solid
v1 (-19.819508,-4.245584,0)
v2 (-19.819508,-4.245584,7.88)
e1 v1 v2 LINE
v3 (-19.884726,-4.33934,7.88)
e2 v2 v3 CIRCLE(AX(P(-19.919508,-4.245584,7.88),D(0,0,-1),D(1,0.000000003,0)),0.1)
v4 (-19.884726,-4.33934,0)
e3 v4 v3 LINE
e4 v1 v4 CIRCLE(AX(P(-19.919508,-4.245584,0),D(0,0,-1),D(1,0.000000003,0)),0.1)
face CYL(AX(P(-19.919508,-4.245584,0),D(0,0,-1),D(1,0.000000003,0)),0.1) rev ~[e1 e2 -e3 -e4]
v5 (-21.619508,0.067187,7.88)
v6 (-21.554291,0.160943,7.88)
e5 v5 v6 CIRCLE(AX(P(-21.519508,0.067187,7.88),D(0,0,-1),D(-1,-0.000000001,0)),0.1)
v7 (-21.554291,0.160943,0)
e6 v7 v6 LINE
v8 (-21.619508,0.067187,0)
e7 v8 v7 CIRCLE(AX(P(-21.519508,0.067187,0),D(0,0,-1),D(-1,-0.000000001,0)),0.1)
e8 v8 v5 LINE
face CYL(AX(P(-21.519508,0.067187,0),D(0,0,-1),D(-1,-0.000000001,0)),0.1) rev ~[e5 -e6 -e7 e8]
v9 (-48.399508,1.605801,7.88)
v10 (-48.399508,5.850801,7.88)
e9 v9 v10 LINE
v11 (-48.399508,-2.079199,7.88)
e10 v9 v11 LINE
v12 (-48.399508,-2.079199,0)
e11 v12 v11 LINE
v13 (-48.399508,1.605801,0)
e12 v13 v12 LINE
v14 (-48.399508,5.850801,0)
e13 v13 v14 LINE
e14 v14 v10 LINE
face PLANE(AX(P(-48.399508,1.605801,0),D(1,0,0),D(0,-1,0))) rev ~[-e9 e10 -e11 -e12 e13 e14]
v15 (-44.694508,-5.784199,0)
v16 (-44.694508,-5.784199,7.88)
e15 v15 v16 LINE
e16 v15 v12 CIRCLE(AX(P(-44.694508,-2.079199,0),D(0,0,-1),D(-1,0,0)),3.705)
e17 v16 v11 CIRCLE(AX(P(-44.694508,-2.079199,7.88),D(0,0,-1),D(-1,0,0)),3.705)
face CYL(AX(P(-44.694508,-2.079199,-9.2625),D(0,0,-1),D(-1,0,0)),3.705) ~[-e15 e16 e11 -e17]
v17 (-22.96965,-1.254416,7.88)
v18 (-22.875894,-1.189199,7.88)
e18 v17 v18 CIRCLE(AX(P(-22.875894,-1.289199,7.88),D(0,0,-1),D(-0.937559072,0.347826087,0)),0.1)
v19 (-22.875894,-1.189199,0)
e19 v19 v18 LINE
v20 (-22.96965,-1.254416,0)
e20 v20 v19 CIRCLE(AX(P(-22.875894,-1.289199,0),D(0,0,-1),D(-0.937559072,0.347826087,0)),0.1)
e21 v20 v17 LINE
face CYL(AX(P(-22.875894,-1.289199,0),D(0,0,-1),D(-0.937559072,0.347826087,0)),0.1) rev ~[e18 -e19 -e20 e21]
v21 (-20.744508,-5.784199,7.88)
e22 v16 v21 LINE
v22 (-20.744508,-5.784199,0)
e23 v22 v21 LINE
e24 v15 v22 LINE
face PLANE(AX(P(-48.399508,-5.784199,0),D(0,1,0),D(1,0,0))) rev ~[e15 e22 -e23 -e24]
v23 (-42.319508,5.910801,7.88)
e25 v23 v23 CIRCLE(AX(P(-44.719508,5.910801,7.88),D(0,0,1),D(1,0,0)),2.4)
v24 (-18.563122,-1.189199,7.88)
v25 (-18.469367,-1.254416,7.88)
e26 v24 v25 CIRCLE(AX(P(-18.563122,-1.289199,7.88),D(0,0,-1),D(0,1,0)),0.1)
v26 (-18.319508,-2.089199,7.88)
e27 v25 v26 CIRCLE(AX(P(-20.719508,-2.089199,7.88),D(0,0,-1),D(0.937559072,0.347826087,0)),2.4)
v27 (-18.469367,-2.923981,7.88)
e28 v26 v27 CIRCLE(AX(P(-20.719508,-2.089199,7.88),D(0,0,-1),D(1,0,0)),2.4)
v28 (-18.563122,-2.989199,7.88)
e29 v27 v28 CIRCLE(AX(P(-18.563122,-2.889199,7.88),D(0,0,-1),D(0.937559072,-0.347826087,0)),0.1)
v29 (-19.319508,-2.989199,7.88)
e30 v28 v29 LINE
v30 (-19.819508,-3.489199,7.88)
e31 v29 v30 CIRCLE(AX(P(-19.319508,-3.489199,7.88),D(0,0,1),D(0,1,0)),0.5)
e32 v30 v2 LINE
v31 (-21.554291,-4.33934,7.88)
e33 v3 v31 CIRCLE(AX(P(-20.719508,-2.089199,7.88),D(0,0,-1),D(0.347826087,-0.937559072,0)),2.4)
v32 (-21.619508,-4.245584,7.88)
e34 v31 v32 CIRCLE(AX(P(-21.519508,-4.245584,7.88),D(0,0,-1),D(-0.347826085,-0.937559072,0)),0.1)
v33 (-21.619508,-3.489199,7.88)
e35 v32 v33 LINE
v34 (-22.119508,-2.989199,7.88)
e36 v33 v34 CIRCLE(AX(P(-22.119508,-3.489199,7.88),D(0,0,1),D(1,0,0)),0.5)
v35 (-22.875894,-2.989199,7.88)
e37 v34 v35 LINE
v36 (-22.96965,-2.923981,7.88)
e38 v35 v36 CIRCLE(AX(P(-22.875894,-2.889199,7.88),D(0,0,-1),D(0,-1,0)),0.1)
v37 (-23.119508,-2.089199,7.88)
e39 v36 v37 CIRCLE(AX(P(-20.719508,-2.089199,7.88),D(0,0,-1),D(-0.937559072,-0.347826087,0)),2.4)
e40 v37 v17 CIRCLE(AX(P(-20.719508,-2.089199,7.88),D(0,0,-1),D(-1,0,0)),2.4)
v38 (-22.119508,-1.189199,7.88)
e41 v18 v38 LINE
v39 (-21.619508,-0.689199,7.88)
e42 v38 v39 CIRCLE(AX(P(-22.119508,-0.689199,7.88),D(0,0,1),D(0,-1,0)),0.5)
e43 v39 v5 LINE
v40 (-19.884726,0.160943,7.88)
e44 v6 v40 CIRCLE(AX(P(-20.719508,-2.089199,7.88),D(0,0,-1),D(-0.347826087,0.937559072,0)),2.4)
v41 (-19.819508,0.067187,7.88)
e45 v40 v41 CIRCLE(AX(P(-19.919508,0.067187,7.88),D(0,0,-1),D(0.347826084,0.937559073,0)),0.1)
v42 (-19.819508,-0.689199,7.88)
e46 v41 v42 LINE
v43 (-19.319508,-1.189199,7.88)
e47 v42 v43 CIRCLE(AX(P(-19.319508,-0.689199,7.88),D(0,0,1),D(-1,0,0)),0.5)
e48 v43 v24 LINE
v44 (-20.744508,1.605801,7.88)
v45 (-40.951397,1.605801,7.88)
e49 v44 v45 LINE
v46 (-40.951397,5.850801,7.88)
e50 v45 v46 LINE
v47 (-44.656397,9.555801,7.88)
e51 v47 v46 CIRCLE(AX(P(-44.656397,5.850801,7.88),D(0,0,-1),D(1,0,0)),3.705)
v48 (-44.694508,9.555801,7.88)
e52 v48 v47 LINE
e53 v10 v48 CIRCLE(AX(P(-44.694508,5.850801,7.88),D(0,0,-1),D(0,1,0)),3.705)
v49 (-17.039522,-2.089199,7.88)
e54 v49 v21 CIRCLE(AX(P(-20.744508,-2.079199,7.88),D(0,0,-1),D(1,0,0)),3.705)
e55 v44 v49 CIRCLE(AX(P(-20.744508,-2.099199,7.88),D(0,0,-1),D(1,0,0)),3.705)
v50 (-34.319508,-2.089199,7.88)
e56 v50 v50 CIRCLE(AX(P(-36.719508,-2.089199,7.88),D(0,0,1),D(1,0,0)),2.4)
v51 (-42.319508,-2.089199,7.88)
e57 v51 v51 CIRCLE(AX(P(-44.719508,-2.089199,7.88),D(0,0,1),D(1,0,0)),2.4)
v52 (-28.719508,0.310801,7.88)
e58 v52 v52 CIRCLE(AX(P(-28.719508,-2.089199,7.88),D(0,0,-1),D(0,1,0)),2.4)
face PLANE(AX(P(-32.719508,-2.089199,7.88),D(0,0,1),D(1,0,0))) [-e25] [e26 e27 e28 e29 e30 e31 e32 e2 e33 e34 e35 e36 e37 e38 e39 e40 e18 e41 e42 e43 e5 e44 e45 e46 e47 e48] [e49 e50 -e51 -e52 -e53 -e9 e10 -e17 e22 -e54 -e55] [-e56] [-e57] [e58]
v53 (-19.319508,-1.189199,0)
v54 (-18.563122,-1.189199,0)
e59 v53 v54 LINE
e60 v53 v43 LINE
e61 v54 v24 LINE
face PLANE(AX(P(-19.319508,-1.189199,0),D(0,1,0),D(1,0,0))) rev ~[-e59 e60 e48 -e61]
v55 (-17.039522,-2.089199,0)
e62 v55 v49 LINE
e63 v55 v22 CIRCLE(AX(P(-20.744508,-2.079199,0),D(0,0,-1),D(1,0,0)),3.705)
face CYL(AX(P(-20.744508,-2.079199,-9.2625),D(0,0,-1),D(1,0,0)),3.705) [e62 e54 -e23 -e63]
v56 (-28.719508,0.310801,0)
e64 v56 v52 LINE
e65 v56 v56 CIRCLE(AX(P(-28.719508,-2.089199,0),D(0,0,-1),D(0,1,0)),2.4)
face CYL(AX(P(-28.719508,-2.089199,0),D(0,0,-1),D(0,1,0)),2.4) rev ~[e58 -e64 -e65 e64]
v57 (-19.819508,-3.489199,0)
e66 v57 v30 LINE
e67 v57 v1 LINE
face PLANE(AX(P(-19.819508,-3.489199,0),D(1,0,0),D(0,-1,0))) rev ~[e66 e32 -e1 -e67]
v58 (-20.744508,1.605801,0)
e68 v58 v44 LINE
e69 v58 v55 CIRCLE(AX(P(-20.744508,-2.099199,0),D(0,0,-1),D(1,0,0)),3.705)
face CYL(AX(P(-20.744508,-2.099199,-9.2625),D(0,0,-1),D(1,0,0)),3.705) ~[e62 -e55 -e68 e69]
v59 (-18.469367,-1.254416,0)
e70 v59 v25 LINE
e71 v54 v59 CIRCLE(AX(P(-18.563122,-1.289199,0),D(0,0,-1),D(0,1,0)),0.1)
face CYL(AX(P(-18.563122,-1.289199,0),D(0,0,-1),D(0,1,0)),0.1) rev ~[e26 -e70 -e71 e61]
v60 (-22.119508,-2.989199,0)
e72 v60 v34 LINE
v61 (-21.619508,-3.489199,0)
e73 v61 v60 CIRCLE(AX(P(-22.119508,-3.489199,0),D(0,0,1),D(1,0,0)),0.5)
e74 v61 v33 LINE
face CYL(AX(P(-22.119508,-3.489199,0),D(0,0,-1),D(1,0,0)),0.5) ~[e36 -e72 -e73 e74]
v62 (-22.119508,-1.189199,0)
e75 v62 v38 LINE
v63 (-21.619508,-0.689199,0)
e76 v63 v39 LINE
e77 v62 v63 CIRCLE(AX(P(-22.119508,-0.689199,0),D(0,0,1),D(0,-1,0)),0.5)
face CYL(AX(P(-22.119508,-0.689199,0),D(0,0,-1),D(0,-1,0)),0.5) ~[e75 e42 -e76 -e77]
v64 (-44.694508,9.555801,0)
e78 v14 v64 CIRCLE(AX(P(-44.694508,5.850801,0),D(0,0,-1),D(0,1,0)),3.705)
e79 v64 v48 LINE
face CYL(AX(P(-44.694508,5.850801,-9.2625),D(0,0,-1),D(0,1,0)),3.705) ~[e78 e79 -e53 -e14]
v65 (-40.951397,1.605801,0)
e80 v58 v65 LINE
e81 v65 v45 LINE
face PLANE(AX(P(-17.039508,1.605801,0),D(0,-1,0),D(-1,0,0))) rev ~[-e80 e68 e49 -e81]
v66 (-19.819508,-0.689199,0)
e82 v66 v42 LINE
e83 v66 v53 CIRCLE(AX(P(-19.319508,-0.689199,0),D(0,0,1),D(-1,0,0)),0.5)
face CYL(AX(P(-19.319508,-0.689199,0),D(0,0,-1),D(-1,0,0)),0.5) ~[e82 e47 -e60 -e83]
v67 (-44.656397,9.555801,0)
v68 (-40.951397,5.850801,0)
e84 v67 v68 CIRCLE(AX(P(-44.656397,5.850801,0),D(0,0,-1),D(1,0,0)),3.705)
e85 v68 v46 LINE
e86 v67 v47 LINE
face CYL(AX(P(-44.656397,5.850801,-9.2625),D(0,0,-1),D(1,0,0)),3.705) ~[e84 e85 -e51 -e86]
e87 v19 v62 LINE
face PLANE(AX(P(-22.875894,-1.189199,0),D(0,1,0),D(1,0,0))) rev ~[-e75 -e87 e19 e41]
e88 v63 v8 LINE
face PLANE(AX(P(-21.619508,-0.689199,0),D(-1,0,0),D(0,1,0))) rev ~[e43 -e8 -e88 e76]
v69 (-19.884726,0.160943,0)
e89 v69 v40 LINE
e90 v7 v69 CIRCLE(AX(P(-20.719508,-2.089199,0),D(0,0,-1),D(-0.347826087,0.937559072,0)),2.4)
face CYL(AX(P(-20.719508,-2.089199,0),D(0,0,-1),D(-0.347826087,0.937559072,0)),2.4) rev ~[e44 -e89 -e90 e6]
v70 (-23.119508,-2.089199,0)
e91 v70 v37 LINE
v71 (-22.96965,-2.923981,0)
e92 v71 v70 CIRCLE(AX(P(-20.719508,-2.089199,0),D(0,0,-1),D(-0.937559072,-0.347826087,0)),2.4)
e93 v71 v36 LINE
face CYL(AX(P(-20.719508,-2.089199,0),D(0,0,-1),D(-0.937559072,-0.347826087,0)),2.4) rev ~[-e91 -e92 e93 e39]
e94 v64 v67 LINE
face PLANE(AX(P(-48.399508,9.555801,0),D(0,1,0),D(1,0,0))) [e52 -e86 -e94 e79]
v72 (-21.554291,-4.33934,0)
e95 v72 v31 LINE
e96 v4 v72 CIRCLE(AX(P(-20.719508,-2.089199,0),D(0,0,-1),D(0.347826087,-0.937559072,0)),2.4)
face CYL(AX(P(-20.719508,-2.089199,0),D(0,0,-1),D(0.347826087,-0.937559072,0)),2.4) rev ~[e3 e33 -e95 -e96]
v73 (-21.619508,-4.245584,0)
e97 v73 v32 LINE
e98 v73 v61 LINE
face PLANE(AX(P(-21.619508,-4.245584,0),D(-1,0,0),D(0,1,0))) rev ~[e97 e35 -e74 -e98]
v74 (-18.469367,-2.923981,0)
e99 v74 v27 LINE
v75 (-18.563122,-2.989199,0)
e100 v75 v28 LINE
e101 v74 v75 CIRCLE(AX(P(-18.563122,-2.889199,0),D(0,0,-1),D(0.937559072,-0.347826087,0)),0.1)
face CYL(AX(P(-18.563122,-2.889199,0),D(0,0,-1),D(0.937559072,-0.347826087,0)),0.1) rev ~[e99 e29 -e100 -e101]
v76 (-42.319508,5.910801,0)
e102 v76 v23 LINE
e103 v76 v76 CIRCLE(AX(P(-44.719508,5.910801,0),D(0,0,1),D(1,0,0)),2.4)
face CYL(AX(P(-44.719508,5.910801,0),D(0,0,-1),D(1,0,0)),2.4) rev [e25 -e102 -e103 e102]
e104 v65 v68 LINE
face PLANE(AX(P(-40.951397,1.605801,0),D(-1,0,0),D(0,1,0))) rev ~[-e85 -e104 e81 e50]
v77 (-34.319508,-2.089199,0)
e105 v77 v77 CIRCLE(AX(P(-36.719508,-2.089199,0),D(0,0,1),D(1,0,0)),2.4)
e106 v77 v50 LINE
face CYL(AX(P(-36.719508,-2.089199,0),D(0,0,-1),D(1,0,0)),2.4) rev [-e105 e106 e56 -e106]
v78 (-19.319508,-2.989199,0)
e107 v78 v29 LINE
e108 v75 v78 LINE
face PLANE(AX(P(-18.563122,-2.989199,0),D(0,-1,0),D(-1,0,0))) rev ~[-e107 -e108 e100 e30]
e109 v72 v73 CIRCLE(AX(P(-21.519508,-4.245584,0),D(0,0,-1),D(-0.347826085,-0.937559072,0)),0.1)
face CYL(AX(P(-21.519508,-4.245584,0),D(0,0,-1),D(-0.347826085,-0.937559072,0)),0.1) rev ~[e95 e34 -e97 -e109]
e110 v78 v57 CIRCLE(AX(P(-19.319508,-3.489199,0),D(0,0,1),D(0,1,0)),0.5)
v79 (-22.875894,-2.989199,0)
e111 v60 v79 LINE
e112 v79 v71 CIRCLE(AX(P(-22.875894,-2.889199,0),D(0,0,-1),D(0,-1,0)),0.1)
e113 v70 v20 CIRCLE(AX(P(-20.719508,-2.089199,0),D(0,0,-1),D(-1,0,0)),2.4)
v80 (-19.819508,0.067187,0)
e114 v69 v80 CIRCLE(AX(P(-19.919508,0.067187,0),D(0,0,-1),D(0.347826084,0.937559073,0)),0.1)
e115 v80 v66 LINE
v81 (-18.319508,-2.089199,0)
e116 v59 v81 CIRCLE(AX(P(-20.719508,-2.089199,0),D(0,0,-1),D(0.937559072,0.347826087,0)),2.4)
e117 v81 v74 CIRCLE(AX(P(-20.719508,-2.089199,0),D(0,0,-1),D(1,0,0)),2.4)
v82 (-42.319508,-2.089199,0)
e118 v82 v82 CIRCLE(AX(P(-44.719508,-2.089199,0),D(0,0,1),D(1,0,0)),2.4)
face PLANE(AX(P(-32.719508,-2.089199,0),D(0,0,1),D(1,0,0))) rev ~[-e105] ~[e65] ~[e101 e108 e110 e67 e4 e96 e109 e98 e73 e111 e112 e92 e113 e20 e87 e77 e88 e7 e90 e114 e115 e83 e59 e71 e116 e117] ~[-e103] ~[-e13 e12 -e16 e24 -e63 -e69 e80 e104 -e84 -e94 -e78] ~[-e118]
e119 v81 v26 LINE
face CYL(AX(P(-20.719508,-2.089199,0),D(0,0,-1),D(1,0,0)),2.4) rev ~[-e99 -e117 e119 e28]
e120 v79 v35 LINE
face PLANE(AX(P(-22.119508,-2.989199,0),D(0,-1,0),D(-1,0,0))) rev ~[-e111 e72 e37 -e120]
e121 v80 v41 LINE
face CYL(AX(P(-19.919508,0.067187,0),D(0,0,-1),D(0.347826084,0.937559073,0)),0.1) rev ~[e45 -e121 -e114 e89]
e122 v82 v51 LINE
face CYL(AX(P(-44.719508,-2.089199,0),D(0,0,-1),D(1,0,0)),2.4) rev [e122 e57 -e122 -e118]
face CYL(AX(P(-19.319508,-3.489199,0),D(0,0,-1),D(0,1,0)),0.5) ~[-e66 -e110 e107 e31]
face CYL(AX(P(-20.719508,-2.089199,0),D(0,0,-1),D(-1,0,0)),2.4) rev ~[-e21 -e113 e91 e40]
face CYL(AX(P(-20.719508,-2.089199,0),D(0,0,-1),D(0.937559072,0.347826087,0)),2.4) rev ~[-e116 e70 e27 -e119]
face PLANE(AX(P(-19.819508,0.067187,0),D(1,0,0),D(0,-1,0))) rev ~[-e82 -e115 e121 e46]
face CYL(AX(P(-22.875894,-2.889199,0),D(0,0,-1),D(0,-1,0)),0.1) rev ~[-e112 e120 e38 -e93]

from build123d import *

# Parameters (mm, degrees)
F0_R        = 2.4
F0_W        = 7.4481110471
F0_H        = 7.95
F1_DEPTH    = 7.88
F2_T1_DEPTH = 26.405


# Not quite as in the source:
# - a fillet or chamfer that OpenCascade refuses, or shapes differently, is made with other operations: its cross-section is extruded or revolved along the edge and cut away or added


with BuildPart() as f1:
    # F0 (on Top) → F1 (new body)
    with BuildSketch(Plane.XY):
        Polygon((-17.0395083171, 1.6058013724), (-28.7195083171, 1.6058013724), (-40.95139727, 1.6058013724), (-48.3995083171, 1.6058013724), (-48.3995083171, -5.7841986276), (-31.3221290569, -5.7841986276), (-17.0395083171, -5.7841986276), align=None)
        with Locations((-44.7195083171, -2.0891986276)):
            Circle(F0_R, mode=Mode.SUBTRACT)
        with Locations((-36.7195083171, -2.0891986276)):
            Circle(F0_R, mode=Mode.SUBTRACT)
        with BuildLine():
            ThreePointArc((-28.7195083171, -4.4891986276), (-31.1195083171, -2.0891986276), (-28.7195083171, 0.3108013724))
            ThreePointArc((-28.7195083171, 0.3108013724), (-26.3195083171, -2.0891986276), (-28.7195083171, -4.4891986276))
        make_face(mode=Mode.SUBTRACT)
        with BuildLine():
            ThreePointArc((-22.1195083171, -1.1891986276), (-21.7659549265, -1.0427520182), (-21.6195083171, -0.6891986276))
            Line((-21.6195083171, -0.6891986276), (-21.6195083171, 0.0671872376))
            ThreePointArc((-21.6195083171, 0.0671872376), (-21.601600524, 0.1242912617), (-21.5542909257, 0.1609431448))
            ThreePointArc((-21.5542909257, 0.1609431448), (-20.7195083171, 0.3108013724), (-19.8847257084, 0.1609431448))
            ThreePointArc((-19.8847257084, 0.1609431448), (-19.8374161101, 0.1242912617), (-19.8195083171, 0.0671872376))
            Line((-19.8195083171, 0.0671872376), (-19.8195083171, -0.6891986276))
            ThreePointArc((-19.8195083171, -0.6891986276), (-19.6730617076, -1.0427520182), (-19.3195083171, -1.1891986276))
            Line((-19.3195083171, -1.1891986276), (-18.5631224518, -1.1891986276))
            ThreePointArc((-18.5631224518, -1.1891986276), (-18.5060184277, -1.2071064207), (-18.4693665446, -1.2544160189))
            ThreePointArc((-18.4693665446, -1.2544160189), (-18.3572699449, -1.6651351029), (-18.3195083171, -2.0891986276))
            ThreePointArc((-18.3195083171, -2.0891986276), (-18.3572699449, -2.5132621524), (-18.4693665446, -2.9239812363))
            ThreePointArc((-18.4693665446, -2.9239812363), (-18.5060184277, -2.9712908345), (-18.5631224518, -2.9891986276))
            Line((-18.5631224518, -2.9891986276), (-19.3195083171, -2.9891986276))
            ThreePointArc((-19.3195083171, -2.9891986276), (-19.6730617076, -3.135645237), (-19.8195083171, -3.4891986276))
            Line((-19.8195083171, -3.4891986276), (-19.8195083171, -4.2455844929))
            ThreePointArc((-19.8195083171, -4.2455844929), (-19.8374161101, -4.302688517), (-19.8847257084, -4.3393404001))
            ThreePointArc((-19.8847257084, -4.3393404001), (-20.7195083171, -4.4891986276), (-21.5542909257, -4.3393404001))
            ThreePointArc((-21.5542909257, -4.3393404001), (-21.601600524, -4.302688517), (-21.6195083171, -4.2455844929))
            Line((-21.6195083171, -4.2455844929), (-21.6195083171, -3.4891986276))
            ThreePointArc((-21.6195083171, -3.4891986276), (-21.7659549265, -3.135645237), (-22.1195083171, -2.9891986276))
            Line((-22.1195083171, -2.9891986276), (-22.8758941823, -2.9891986276))
            ThreePointArc((-22.8758941823, -2.9891986276), (-22.9329982064, -2.9712908345), (-22.9696500895, -2.9239812363))
            ThreePointArc((-22.9696500895, -2.9239812363), (-23.0817466892, -2.5132621524), (-23.1195083171, -2.0891986276))
            ThreePointArc((-23.1195083171, -2.0891986276), (-23.0817466892, -1.6651351029), (-22.9696500895, -1.2544160189))
            ThreePointArc((-22.9696500895, -1.2544160189), (-22.9329982064, -1.2071064207), (-22.8758941823, -1.1891986276))
            Line((-22.8758941823, -1.1891986276), (-22.1195083171, -1.1891986276))
        make_face(mode=Mode.SUBTRACT)
        with Locations((-44.6754527935, 5.5808013724)):
            Rectangle(F0_W, F0_H)
        with Locations((-44.7195083171, 5.9108013724)):
            Circle(F0_R, mode=Mode.SUBTRACT)
    extrude(amount=F1_DEPTH)

    # F2: fillet of radius 3.705 on 5 edges, made by hand

    # F2_s2 → F2_t1 (cut)
    with BuildSketch(Plane.XY.offset(-9.2625)):
        with BuildLine():
            ThreePointArc((-44.6945083171, 9.5558013724), (-47.3143389413, 8.4706319967), (-48.3995083171, 5.8508013724))
            Line((-48.3995083171, 5.8508013724), (-48.3995083171, 9.5558013724))
            Line((-48.3995083171, 9.5558013724), (-44.6945083171, 9.5558013724))
        make_face()
        with BuildLine():
            ThreePointArc((-40.95139727, 5.8508013724), (-42.0365666457, 8.4706319967), (-44.65639727, 9.5558013724))
            Line((-44.65639727, 9.5558013724), (-40.95139727, 9.5558013724))
            Line((-40.95139727, 9.5558013724), (-40.95139727, 5.8508013724))
        make_face()
        with BuildLine():
            ThreePointArc((-48.3995083171, -2.0791986276), (-47.3143389413, -4.6990292519), (-44.6945083171, -5.7841986276))
            Line((-44.6945083171, -5.7841986276), (-48.3995083171, -5.7841986276))
            Line((-48.3995083171, -5.7841986276), (-48.3995083171, -2.0791986276))
        make_face()
        with BuildLine():
            ThreePointArc((-17.0395083171, -2.0991986276), (-18.1246776928, 0.5206319967), (-20.7445083171, 1.6058013724))
            Line((-20.7445083171, 1.6058013724), (-17.0395083171, 1.6058013724))
            Line((-17.0395083171, 1.6058013724), (-17.0395083171, -2.0991986276))
        make_face()
        with BuildLine():
            ThreePointArc((-17.0395083171, -2.0791986276), (-18.1246776928, -4.6990292519), (-20.7445083171, -5.7841986276))
            Line((-20.7445083171, -5.7841986276), (-17.0395083171, -5.7841986276))
            Line((-17.0395083171, -5.7841986276), (-17.0395083171, -2.0791986276))
        make_face()
    extrude(amount=F2_T1_DEPTH, mode=Mode.SUBTRACT)


solid = f1.part
